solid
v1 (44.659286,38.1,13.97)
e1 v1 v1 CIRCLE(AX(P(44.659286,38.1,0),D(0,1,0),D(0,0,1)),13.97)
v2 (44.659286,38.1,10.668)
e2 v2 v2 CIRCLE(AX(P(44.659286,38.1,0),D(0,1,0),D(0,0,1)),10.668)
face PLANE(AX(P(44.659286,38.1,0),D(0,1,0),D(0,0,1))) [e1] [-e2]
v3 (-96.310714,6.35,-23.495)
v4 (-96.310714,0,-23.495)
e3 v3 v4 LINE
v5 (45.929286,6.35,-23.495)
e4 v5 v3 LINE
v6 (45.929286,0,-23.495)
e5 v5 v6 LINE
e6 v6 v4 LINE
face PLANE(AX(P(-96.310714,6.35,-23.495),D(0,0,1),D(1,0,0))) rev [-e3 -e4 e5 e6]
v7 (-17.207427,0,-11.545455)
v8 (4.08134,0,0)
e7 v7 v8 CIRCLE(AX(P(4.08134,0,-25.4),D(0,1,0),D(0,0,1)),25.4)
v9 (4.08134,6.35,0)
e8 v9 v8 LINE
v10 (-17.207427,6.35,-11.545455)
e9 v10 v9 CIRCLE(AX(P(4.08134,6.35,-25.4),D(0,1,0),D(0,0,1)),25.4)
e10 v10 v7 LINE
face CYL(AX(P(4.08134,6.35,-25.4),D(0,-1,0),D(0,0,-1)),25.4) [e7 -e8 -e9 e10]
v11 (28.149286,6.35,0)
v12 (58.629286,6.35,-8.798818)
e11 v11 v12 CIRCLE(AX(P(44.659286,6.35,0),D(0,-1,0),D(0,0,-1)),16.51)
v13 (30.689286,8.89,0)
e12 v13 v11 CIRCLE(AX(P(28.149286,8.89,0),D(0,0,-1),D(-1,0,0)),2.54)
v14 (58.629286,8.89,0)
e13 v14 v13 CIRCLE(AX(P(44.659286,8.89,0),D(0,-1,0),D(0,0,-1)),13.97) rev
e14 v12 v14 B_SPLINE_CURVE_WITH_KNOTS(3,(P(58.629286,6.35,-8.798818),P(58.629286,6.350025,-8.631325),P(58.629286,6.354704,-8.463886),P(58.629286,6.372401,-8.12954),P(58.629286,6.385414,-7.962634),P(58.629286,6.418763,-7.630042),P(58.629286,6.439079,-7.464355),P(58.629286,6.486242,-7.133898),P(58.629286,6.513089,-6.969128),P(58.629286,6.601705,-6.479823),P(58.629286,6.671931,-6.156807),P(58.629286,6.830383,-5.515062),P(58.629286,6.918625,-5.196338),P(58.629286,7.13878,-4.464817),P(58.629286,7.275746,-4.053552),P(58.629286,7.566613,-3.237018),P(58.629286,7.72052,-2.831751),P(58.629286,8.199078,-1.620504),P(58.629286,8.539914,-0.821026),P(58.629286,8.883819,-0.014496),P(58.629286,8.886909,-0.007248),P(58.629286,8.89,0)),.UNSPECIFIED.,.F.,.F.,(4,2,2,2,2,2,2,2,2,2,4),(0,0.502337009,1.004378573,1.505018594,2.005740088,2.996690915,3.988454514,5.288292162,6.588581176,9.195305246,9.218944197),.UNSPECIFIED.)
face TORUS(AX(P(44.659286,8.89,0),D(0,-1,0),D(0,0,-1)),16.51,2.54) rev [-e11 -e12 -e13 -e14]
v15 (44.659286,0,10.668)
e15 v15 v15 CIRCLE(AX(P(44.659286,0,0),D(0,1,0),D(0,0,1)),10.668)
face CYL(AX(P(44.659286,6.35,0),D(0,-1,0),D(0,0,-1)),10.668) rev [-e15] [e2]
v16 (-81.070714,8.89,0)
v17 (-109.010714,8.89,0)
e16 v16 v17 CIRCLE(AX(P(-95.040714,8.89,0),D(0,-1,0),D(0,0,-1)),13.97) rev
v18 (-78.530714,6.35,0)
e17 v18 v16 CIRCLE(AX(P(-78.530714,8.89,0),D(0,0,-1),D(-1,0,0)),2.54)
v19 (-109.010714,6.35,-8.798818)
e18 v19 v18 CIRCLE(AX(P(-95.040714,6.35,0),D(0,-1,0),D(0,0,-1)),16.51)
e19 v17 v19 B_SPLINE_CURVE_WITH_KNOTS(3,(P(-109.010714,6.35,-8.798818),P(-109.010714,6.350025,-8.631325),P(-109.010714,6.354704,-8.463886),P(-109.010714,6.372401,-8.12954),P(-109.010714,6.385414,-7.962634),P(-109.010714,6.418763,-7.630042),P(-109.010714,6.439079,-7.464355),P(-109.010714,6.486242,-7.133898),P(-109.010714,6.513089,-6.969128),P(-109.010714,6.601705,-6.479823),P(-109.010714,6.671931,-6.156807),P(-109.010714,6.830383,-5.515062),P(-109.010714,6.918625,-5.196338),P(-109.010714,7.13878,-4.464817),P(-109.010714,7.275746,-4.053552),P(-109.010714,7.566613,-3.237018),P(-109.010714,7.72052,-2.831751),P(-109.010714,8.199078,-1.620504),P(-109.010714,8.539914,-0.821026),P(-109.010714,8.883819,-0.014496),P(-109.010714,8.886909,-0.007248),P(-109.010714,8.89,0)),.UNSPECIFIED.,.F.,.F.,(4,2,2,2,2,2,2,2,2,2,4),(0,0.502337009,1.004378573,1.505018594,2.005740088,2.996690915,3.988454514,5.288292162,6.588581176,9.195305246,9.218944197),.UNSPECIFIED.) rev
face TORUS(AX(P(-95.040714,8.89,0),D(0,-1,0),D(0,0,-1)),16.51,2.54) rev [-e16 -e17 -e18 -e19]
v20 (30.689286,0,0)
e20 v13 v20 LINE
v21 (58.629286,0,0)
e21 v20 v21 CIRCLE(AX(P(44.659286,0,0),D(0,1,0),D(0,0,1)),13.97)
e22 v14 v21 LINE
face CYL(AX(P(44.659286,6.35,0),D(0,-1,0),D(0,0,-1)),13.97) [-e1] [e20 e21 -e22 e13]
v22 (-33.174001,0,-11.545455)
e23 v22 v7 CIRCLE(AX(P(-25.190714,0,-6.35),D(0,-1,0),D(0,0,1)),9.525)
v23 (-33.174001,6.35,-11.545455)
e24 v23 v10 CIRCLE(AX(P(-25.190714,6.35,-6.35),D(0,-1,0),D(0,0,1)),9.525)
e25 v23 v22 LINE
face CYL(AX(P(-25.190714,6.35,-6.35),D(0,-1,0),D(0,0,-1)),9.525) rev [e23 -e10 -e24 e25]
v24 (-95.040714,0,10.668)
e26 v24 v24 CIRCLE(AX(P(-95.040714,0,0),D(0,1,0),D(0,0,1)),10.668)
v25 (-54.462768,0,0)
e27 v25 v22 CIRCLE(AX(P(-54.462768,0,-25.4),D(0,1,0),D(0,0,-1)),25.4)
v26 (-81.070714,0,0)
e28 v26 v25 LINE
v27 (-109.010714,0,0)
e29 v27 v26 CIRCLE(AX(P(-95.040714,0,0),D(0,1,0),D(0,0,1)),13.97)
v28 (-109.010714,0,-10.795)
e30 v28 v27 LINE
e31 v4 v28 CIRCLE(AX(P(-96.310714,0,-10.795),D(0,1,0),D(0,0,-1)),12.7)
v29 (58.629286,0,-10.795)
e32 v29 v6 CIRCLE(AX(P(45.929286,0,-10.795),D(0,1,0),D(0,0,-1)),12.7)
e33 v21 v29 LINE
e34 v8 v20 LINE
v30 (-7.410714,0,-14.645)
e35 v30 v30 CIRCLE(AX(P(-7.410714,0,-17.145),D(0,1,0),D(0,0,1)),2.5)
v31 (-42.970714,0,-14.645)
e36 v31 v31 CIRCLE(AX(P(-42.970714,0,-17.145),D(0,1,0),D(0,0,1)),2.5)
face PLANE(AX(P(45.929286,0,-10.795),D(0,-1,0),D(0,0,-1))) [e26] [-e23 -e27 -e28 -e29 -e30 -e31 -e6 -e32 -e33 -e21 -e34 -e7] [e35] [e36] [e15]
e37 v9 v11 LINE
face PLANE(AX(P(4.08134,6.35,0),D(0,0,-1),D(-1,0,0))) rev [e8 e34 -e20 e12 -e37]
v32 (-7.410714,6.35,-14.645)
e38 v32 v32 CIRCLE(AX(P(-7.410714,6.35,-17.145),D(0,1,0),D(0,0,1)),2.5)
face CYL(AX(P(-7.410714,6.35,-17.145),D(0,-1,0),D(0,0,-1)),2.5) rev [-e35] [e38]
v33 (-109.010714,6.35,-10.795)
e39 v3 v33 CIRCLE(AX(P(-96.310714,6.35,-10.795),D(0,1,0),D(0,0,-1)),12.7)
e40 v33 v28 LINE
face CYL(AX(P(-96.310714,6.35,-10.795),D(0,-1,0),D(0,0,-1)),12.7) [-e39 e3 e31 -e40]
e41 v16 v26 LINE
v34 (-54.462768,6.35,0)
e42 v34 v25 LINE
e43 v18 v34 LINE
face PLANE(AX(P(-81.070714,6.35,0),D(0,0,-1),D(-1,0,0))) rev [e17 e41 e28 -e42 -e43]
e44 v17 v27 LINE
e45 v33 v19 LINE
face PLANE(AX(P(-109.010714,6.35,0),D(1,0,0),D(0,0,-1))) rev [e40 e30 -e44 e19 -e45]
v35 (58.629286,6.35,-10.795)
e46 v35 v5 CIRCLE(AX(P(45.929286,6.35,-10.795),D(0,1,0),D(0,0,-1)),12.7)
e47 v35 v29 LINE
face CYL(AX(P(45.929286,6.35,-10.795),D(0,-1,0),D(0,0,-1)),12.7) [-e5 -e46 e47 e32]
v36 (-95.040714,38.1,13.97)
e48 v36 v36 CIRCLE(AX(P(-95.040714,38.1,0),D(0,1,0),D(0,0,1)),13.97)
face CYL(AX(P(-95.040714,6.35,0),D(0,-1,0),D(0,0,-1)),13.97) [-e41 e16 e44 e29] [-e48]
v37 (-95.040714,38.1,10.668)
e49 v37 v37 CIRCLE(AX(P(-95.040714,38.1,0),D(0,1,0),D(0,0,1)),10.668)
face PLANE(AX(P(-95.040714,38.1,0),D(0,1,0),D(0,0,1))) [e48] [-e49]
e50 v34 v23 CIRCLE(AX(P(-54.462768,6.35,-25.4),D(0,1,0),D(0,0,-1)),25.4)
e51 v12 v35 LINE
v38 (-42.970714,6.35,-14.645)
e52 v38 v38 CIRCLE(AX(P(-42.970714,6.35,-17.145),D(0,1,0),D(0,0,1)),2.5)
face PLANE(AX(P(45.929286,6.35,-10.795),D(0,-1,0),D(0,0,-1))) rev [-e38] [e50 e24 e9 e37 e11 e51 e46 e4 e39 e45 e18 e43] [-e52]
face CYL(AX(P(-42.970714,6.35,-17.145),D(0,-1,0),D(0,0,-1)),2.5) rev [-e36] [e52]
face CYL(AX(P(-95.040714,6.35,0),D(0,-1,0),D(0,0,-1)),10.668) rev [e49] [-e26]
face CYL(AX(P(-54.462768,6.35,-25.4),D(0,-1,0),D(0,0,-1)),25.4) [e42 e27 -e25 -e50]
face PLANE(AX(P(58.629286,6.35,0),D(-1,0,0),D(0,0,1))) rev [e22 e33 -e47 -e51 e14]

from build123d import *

# Parameters (mm, degrees)
SKETCH1_R           = 10.668
SKETCH1_R_2         = 2.5
BOSS_EXTRUDE1_DEPTH = 6.35
SKETCH2_R           = 13.97
SKETCH2_R_2         = 10.668
BOSS_EXTRUDE2_DEPTH = 31.75
FILLET1_R           = 2.54


with BuildPart() as part:
    # Sketch1 → Boss-Extrude1 (new body)
    with BuildSketch(Plane(origin=(0, 0, 0), x_dir=(1, 0, 0), z_dir=(0, 1, 0))):
        with BuildLine():
            Line((-81.070713968, 0), (-54.46276762, 0))
            ThreePointArc((-54.46276762, 0), (-42.353792737, 3.072153546), (-33.174001328, 11.545454545))
            ThreePointArc((-33.174001328, 11.545454545), (-25.190713968, 15.875), (-17.207426609, 11.545454545))
            ThreePointArc((-17.207426609, 11.545454545), (-8.0276352, 3.072153546), (4.081339684, 0))
            Line((4.081339684, 0), (30.689286032, 0))
            ThreePointArc((30.689286032, 0), (44.659286032, -13.97), (58.629286032, 0))
            Line((58.629286032, 0), (58.629286032, 10.795))
            ThreePointArc((58.629286032, 10.795), (54.909542153, 19.775256121), (45.929286032, 23.495))
            Line((45.929286032, 23.495), (-96.310713968, 23.495))
            ThreePointArc((-96.310713968, 23.495), (-105.290970089, 19.775256121), (-109.010713968, 10.795))
            Line((-109.010713968, 10.795), (-109.010713968, 0))
            ThreePointArc((-109.010713968, 0), (-95.040713968, -13.97), (-81.070713968, 0))
        make_face()
        with Locations(Location((-95.040713968, 0, 0), (0, 0, 270))):
            Circle(SKETCH1_R, mode=Mode.SUBTRACT)
        with Locations(Location((44.659286032, 0, 0), (0, 0, 270))):
            Circle(SKETCH1_R, mode=Mode.SUBTRACT)
        with Locations(Location((-7.410713968, 17.145, 0), (0, 0, 270))):
            Circle(SKETCH1_R_2, mode=Mode.SUBTRACT)
        with Locations(Location((-42.970713968, 17.145, 0), (0, 0, 270))):
            Circle(SKETCH1_R_2, mode=Mode.SUBTRACT)
    extrude(amount=BOSS_EXTRUDE1_DEPTH)

    # Sketch2 → Boss-Extrude2 (add)
    # profile 1 of 2: a face of its own
    with BuildSketch(Plane(origin=(0, 6.35, 0), x_dir=(1, 0, 0), z_dir=(0, 1, 0))):
        with Locations((-95.040713968, 0)):
            Circle(SKETCH2_R)
        with Locations(Location((-95.040713968, 0, 0), (0, 0, 270))):
            Circle(SKETCH2_R_2, mode=Mode.SUBTRACT)
    # profile 2 of 2: a face of its own
    with BuildSketch(Plane(origin=(0, 6.35, 0), x_dir=(1, 0, 0), z_dir=(0, 1, 0))):
        with Locations((44.659286032, 0)):
            Circle(SKETCH2_R)
        with Locations(Location((44.659286032, 0, 0), (0, 0, 270))):
            Circle(SKETCH2_R_2, mode=Mode.SUBTRACT)
    extrude(amount=BOSS_EXTRUDE2_DEPTH)

    # Fillet1
    # the kernel refuses this fillet: 2.54 mm, written as the material it adds along each edge
    with BuildSketch(Plane(origin=(-95.040713968, 6.35, 0), x_dir=(1, 0, 0), z_dir=(0, 0, 1))) as fillet1_piece_1_section:
        with BuildLine():
            CenterArc((13.97 + FILLET1_R, FILLET1_R), FILLET1_R, 180, 90)
            Line((13.97, FILLET1_R), (13.97, 0))
            Line((13.97, 0), (13.97 + FILLET1_R, 0))
        make_face()
    fillet1_piece_1 = revolve(axis=Axis((-95.040713968, 6.35, 0), (0, 1, 0)), revolution_arc=180, mode=Mode.PRIVATE)
    fillet1_piece_1 = split(fillet1_piece_1, bisect_by=Plane(origin=(-109.010713968, 7.066562121, -14.686562121), z_dir=(1, 0, 0)), keep=Keep.TOP, mode=Mode.PRIVATE)
    add(fillet1_piece_1)
    with BuildSketch(Plane(origin=(44.659286032, 6.35, 0), x_dir=(1, 0, 0), z_dir=(0, 0, 1))) as fillet1_piece_2_section:
        with BuildLine():
            CenterArc((13.97 + FILLET1_R, FILLET1_R), FILLET1_R, 180, 90)
            Line((13.97, FILLET1_R), (13.97, 0))
            Line((13.97, 0), (13.97 + FILLET1_R, 0))
        make_face()
    fillet1_piece_2 = revolve(axis=Axis((44.659286032, 6.35, 0), (0, 1, 0)), revolution_arc=180, mode=Mode.PRIVATE)
    fillet1_piece_2 = split(fillet1_piece_2, bisect_by=Plane(origin=(58.629286032, 7.62, -14.008730581), z_dir=(-1, 0, 0)), keep=Keep.TOP, mode=Mode.PRIVATE)
    add(fillet1_piece_2)


solid = part.part
